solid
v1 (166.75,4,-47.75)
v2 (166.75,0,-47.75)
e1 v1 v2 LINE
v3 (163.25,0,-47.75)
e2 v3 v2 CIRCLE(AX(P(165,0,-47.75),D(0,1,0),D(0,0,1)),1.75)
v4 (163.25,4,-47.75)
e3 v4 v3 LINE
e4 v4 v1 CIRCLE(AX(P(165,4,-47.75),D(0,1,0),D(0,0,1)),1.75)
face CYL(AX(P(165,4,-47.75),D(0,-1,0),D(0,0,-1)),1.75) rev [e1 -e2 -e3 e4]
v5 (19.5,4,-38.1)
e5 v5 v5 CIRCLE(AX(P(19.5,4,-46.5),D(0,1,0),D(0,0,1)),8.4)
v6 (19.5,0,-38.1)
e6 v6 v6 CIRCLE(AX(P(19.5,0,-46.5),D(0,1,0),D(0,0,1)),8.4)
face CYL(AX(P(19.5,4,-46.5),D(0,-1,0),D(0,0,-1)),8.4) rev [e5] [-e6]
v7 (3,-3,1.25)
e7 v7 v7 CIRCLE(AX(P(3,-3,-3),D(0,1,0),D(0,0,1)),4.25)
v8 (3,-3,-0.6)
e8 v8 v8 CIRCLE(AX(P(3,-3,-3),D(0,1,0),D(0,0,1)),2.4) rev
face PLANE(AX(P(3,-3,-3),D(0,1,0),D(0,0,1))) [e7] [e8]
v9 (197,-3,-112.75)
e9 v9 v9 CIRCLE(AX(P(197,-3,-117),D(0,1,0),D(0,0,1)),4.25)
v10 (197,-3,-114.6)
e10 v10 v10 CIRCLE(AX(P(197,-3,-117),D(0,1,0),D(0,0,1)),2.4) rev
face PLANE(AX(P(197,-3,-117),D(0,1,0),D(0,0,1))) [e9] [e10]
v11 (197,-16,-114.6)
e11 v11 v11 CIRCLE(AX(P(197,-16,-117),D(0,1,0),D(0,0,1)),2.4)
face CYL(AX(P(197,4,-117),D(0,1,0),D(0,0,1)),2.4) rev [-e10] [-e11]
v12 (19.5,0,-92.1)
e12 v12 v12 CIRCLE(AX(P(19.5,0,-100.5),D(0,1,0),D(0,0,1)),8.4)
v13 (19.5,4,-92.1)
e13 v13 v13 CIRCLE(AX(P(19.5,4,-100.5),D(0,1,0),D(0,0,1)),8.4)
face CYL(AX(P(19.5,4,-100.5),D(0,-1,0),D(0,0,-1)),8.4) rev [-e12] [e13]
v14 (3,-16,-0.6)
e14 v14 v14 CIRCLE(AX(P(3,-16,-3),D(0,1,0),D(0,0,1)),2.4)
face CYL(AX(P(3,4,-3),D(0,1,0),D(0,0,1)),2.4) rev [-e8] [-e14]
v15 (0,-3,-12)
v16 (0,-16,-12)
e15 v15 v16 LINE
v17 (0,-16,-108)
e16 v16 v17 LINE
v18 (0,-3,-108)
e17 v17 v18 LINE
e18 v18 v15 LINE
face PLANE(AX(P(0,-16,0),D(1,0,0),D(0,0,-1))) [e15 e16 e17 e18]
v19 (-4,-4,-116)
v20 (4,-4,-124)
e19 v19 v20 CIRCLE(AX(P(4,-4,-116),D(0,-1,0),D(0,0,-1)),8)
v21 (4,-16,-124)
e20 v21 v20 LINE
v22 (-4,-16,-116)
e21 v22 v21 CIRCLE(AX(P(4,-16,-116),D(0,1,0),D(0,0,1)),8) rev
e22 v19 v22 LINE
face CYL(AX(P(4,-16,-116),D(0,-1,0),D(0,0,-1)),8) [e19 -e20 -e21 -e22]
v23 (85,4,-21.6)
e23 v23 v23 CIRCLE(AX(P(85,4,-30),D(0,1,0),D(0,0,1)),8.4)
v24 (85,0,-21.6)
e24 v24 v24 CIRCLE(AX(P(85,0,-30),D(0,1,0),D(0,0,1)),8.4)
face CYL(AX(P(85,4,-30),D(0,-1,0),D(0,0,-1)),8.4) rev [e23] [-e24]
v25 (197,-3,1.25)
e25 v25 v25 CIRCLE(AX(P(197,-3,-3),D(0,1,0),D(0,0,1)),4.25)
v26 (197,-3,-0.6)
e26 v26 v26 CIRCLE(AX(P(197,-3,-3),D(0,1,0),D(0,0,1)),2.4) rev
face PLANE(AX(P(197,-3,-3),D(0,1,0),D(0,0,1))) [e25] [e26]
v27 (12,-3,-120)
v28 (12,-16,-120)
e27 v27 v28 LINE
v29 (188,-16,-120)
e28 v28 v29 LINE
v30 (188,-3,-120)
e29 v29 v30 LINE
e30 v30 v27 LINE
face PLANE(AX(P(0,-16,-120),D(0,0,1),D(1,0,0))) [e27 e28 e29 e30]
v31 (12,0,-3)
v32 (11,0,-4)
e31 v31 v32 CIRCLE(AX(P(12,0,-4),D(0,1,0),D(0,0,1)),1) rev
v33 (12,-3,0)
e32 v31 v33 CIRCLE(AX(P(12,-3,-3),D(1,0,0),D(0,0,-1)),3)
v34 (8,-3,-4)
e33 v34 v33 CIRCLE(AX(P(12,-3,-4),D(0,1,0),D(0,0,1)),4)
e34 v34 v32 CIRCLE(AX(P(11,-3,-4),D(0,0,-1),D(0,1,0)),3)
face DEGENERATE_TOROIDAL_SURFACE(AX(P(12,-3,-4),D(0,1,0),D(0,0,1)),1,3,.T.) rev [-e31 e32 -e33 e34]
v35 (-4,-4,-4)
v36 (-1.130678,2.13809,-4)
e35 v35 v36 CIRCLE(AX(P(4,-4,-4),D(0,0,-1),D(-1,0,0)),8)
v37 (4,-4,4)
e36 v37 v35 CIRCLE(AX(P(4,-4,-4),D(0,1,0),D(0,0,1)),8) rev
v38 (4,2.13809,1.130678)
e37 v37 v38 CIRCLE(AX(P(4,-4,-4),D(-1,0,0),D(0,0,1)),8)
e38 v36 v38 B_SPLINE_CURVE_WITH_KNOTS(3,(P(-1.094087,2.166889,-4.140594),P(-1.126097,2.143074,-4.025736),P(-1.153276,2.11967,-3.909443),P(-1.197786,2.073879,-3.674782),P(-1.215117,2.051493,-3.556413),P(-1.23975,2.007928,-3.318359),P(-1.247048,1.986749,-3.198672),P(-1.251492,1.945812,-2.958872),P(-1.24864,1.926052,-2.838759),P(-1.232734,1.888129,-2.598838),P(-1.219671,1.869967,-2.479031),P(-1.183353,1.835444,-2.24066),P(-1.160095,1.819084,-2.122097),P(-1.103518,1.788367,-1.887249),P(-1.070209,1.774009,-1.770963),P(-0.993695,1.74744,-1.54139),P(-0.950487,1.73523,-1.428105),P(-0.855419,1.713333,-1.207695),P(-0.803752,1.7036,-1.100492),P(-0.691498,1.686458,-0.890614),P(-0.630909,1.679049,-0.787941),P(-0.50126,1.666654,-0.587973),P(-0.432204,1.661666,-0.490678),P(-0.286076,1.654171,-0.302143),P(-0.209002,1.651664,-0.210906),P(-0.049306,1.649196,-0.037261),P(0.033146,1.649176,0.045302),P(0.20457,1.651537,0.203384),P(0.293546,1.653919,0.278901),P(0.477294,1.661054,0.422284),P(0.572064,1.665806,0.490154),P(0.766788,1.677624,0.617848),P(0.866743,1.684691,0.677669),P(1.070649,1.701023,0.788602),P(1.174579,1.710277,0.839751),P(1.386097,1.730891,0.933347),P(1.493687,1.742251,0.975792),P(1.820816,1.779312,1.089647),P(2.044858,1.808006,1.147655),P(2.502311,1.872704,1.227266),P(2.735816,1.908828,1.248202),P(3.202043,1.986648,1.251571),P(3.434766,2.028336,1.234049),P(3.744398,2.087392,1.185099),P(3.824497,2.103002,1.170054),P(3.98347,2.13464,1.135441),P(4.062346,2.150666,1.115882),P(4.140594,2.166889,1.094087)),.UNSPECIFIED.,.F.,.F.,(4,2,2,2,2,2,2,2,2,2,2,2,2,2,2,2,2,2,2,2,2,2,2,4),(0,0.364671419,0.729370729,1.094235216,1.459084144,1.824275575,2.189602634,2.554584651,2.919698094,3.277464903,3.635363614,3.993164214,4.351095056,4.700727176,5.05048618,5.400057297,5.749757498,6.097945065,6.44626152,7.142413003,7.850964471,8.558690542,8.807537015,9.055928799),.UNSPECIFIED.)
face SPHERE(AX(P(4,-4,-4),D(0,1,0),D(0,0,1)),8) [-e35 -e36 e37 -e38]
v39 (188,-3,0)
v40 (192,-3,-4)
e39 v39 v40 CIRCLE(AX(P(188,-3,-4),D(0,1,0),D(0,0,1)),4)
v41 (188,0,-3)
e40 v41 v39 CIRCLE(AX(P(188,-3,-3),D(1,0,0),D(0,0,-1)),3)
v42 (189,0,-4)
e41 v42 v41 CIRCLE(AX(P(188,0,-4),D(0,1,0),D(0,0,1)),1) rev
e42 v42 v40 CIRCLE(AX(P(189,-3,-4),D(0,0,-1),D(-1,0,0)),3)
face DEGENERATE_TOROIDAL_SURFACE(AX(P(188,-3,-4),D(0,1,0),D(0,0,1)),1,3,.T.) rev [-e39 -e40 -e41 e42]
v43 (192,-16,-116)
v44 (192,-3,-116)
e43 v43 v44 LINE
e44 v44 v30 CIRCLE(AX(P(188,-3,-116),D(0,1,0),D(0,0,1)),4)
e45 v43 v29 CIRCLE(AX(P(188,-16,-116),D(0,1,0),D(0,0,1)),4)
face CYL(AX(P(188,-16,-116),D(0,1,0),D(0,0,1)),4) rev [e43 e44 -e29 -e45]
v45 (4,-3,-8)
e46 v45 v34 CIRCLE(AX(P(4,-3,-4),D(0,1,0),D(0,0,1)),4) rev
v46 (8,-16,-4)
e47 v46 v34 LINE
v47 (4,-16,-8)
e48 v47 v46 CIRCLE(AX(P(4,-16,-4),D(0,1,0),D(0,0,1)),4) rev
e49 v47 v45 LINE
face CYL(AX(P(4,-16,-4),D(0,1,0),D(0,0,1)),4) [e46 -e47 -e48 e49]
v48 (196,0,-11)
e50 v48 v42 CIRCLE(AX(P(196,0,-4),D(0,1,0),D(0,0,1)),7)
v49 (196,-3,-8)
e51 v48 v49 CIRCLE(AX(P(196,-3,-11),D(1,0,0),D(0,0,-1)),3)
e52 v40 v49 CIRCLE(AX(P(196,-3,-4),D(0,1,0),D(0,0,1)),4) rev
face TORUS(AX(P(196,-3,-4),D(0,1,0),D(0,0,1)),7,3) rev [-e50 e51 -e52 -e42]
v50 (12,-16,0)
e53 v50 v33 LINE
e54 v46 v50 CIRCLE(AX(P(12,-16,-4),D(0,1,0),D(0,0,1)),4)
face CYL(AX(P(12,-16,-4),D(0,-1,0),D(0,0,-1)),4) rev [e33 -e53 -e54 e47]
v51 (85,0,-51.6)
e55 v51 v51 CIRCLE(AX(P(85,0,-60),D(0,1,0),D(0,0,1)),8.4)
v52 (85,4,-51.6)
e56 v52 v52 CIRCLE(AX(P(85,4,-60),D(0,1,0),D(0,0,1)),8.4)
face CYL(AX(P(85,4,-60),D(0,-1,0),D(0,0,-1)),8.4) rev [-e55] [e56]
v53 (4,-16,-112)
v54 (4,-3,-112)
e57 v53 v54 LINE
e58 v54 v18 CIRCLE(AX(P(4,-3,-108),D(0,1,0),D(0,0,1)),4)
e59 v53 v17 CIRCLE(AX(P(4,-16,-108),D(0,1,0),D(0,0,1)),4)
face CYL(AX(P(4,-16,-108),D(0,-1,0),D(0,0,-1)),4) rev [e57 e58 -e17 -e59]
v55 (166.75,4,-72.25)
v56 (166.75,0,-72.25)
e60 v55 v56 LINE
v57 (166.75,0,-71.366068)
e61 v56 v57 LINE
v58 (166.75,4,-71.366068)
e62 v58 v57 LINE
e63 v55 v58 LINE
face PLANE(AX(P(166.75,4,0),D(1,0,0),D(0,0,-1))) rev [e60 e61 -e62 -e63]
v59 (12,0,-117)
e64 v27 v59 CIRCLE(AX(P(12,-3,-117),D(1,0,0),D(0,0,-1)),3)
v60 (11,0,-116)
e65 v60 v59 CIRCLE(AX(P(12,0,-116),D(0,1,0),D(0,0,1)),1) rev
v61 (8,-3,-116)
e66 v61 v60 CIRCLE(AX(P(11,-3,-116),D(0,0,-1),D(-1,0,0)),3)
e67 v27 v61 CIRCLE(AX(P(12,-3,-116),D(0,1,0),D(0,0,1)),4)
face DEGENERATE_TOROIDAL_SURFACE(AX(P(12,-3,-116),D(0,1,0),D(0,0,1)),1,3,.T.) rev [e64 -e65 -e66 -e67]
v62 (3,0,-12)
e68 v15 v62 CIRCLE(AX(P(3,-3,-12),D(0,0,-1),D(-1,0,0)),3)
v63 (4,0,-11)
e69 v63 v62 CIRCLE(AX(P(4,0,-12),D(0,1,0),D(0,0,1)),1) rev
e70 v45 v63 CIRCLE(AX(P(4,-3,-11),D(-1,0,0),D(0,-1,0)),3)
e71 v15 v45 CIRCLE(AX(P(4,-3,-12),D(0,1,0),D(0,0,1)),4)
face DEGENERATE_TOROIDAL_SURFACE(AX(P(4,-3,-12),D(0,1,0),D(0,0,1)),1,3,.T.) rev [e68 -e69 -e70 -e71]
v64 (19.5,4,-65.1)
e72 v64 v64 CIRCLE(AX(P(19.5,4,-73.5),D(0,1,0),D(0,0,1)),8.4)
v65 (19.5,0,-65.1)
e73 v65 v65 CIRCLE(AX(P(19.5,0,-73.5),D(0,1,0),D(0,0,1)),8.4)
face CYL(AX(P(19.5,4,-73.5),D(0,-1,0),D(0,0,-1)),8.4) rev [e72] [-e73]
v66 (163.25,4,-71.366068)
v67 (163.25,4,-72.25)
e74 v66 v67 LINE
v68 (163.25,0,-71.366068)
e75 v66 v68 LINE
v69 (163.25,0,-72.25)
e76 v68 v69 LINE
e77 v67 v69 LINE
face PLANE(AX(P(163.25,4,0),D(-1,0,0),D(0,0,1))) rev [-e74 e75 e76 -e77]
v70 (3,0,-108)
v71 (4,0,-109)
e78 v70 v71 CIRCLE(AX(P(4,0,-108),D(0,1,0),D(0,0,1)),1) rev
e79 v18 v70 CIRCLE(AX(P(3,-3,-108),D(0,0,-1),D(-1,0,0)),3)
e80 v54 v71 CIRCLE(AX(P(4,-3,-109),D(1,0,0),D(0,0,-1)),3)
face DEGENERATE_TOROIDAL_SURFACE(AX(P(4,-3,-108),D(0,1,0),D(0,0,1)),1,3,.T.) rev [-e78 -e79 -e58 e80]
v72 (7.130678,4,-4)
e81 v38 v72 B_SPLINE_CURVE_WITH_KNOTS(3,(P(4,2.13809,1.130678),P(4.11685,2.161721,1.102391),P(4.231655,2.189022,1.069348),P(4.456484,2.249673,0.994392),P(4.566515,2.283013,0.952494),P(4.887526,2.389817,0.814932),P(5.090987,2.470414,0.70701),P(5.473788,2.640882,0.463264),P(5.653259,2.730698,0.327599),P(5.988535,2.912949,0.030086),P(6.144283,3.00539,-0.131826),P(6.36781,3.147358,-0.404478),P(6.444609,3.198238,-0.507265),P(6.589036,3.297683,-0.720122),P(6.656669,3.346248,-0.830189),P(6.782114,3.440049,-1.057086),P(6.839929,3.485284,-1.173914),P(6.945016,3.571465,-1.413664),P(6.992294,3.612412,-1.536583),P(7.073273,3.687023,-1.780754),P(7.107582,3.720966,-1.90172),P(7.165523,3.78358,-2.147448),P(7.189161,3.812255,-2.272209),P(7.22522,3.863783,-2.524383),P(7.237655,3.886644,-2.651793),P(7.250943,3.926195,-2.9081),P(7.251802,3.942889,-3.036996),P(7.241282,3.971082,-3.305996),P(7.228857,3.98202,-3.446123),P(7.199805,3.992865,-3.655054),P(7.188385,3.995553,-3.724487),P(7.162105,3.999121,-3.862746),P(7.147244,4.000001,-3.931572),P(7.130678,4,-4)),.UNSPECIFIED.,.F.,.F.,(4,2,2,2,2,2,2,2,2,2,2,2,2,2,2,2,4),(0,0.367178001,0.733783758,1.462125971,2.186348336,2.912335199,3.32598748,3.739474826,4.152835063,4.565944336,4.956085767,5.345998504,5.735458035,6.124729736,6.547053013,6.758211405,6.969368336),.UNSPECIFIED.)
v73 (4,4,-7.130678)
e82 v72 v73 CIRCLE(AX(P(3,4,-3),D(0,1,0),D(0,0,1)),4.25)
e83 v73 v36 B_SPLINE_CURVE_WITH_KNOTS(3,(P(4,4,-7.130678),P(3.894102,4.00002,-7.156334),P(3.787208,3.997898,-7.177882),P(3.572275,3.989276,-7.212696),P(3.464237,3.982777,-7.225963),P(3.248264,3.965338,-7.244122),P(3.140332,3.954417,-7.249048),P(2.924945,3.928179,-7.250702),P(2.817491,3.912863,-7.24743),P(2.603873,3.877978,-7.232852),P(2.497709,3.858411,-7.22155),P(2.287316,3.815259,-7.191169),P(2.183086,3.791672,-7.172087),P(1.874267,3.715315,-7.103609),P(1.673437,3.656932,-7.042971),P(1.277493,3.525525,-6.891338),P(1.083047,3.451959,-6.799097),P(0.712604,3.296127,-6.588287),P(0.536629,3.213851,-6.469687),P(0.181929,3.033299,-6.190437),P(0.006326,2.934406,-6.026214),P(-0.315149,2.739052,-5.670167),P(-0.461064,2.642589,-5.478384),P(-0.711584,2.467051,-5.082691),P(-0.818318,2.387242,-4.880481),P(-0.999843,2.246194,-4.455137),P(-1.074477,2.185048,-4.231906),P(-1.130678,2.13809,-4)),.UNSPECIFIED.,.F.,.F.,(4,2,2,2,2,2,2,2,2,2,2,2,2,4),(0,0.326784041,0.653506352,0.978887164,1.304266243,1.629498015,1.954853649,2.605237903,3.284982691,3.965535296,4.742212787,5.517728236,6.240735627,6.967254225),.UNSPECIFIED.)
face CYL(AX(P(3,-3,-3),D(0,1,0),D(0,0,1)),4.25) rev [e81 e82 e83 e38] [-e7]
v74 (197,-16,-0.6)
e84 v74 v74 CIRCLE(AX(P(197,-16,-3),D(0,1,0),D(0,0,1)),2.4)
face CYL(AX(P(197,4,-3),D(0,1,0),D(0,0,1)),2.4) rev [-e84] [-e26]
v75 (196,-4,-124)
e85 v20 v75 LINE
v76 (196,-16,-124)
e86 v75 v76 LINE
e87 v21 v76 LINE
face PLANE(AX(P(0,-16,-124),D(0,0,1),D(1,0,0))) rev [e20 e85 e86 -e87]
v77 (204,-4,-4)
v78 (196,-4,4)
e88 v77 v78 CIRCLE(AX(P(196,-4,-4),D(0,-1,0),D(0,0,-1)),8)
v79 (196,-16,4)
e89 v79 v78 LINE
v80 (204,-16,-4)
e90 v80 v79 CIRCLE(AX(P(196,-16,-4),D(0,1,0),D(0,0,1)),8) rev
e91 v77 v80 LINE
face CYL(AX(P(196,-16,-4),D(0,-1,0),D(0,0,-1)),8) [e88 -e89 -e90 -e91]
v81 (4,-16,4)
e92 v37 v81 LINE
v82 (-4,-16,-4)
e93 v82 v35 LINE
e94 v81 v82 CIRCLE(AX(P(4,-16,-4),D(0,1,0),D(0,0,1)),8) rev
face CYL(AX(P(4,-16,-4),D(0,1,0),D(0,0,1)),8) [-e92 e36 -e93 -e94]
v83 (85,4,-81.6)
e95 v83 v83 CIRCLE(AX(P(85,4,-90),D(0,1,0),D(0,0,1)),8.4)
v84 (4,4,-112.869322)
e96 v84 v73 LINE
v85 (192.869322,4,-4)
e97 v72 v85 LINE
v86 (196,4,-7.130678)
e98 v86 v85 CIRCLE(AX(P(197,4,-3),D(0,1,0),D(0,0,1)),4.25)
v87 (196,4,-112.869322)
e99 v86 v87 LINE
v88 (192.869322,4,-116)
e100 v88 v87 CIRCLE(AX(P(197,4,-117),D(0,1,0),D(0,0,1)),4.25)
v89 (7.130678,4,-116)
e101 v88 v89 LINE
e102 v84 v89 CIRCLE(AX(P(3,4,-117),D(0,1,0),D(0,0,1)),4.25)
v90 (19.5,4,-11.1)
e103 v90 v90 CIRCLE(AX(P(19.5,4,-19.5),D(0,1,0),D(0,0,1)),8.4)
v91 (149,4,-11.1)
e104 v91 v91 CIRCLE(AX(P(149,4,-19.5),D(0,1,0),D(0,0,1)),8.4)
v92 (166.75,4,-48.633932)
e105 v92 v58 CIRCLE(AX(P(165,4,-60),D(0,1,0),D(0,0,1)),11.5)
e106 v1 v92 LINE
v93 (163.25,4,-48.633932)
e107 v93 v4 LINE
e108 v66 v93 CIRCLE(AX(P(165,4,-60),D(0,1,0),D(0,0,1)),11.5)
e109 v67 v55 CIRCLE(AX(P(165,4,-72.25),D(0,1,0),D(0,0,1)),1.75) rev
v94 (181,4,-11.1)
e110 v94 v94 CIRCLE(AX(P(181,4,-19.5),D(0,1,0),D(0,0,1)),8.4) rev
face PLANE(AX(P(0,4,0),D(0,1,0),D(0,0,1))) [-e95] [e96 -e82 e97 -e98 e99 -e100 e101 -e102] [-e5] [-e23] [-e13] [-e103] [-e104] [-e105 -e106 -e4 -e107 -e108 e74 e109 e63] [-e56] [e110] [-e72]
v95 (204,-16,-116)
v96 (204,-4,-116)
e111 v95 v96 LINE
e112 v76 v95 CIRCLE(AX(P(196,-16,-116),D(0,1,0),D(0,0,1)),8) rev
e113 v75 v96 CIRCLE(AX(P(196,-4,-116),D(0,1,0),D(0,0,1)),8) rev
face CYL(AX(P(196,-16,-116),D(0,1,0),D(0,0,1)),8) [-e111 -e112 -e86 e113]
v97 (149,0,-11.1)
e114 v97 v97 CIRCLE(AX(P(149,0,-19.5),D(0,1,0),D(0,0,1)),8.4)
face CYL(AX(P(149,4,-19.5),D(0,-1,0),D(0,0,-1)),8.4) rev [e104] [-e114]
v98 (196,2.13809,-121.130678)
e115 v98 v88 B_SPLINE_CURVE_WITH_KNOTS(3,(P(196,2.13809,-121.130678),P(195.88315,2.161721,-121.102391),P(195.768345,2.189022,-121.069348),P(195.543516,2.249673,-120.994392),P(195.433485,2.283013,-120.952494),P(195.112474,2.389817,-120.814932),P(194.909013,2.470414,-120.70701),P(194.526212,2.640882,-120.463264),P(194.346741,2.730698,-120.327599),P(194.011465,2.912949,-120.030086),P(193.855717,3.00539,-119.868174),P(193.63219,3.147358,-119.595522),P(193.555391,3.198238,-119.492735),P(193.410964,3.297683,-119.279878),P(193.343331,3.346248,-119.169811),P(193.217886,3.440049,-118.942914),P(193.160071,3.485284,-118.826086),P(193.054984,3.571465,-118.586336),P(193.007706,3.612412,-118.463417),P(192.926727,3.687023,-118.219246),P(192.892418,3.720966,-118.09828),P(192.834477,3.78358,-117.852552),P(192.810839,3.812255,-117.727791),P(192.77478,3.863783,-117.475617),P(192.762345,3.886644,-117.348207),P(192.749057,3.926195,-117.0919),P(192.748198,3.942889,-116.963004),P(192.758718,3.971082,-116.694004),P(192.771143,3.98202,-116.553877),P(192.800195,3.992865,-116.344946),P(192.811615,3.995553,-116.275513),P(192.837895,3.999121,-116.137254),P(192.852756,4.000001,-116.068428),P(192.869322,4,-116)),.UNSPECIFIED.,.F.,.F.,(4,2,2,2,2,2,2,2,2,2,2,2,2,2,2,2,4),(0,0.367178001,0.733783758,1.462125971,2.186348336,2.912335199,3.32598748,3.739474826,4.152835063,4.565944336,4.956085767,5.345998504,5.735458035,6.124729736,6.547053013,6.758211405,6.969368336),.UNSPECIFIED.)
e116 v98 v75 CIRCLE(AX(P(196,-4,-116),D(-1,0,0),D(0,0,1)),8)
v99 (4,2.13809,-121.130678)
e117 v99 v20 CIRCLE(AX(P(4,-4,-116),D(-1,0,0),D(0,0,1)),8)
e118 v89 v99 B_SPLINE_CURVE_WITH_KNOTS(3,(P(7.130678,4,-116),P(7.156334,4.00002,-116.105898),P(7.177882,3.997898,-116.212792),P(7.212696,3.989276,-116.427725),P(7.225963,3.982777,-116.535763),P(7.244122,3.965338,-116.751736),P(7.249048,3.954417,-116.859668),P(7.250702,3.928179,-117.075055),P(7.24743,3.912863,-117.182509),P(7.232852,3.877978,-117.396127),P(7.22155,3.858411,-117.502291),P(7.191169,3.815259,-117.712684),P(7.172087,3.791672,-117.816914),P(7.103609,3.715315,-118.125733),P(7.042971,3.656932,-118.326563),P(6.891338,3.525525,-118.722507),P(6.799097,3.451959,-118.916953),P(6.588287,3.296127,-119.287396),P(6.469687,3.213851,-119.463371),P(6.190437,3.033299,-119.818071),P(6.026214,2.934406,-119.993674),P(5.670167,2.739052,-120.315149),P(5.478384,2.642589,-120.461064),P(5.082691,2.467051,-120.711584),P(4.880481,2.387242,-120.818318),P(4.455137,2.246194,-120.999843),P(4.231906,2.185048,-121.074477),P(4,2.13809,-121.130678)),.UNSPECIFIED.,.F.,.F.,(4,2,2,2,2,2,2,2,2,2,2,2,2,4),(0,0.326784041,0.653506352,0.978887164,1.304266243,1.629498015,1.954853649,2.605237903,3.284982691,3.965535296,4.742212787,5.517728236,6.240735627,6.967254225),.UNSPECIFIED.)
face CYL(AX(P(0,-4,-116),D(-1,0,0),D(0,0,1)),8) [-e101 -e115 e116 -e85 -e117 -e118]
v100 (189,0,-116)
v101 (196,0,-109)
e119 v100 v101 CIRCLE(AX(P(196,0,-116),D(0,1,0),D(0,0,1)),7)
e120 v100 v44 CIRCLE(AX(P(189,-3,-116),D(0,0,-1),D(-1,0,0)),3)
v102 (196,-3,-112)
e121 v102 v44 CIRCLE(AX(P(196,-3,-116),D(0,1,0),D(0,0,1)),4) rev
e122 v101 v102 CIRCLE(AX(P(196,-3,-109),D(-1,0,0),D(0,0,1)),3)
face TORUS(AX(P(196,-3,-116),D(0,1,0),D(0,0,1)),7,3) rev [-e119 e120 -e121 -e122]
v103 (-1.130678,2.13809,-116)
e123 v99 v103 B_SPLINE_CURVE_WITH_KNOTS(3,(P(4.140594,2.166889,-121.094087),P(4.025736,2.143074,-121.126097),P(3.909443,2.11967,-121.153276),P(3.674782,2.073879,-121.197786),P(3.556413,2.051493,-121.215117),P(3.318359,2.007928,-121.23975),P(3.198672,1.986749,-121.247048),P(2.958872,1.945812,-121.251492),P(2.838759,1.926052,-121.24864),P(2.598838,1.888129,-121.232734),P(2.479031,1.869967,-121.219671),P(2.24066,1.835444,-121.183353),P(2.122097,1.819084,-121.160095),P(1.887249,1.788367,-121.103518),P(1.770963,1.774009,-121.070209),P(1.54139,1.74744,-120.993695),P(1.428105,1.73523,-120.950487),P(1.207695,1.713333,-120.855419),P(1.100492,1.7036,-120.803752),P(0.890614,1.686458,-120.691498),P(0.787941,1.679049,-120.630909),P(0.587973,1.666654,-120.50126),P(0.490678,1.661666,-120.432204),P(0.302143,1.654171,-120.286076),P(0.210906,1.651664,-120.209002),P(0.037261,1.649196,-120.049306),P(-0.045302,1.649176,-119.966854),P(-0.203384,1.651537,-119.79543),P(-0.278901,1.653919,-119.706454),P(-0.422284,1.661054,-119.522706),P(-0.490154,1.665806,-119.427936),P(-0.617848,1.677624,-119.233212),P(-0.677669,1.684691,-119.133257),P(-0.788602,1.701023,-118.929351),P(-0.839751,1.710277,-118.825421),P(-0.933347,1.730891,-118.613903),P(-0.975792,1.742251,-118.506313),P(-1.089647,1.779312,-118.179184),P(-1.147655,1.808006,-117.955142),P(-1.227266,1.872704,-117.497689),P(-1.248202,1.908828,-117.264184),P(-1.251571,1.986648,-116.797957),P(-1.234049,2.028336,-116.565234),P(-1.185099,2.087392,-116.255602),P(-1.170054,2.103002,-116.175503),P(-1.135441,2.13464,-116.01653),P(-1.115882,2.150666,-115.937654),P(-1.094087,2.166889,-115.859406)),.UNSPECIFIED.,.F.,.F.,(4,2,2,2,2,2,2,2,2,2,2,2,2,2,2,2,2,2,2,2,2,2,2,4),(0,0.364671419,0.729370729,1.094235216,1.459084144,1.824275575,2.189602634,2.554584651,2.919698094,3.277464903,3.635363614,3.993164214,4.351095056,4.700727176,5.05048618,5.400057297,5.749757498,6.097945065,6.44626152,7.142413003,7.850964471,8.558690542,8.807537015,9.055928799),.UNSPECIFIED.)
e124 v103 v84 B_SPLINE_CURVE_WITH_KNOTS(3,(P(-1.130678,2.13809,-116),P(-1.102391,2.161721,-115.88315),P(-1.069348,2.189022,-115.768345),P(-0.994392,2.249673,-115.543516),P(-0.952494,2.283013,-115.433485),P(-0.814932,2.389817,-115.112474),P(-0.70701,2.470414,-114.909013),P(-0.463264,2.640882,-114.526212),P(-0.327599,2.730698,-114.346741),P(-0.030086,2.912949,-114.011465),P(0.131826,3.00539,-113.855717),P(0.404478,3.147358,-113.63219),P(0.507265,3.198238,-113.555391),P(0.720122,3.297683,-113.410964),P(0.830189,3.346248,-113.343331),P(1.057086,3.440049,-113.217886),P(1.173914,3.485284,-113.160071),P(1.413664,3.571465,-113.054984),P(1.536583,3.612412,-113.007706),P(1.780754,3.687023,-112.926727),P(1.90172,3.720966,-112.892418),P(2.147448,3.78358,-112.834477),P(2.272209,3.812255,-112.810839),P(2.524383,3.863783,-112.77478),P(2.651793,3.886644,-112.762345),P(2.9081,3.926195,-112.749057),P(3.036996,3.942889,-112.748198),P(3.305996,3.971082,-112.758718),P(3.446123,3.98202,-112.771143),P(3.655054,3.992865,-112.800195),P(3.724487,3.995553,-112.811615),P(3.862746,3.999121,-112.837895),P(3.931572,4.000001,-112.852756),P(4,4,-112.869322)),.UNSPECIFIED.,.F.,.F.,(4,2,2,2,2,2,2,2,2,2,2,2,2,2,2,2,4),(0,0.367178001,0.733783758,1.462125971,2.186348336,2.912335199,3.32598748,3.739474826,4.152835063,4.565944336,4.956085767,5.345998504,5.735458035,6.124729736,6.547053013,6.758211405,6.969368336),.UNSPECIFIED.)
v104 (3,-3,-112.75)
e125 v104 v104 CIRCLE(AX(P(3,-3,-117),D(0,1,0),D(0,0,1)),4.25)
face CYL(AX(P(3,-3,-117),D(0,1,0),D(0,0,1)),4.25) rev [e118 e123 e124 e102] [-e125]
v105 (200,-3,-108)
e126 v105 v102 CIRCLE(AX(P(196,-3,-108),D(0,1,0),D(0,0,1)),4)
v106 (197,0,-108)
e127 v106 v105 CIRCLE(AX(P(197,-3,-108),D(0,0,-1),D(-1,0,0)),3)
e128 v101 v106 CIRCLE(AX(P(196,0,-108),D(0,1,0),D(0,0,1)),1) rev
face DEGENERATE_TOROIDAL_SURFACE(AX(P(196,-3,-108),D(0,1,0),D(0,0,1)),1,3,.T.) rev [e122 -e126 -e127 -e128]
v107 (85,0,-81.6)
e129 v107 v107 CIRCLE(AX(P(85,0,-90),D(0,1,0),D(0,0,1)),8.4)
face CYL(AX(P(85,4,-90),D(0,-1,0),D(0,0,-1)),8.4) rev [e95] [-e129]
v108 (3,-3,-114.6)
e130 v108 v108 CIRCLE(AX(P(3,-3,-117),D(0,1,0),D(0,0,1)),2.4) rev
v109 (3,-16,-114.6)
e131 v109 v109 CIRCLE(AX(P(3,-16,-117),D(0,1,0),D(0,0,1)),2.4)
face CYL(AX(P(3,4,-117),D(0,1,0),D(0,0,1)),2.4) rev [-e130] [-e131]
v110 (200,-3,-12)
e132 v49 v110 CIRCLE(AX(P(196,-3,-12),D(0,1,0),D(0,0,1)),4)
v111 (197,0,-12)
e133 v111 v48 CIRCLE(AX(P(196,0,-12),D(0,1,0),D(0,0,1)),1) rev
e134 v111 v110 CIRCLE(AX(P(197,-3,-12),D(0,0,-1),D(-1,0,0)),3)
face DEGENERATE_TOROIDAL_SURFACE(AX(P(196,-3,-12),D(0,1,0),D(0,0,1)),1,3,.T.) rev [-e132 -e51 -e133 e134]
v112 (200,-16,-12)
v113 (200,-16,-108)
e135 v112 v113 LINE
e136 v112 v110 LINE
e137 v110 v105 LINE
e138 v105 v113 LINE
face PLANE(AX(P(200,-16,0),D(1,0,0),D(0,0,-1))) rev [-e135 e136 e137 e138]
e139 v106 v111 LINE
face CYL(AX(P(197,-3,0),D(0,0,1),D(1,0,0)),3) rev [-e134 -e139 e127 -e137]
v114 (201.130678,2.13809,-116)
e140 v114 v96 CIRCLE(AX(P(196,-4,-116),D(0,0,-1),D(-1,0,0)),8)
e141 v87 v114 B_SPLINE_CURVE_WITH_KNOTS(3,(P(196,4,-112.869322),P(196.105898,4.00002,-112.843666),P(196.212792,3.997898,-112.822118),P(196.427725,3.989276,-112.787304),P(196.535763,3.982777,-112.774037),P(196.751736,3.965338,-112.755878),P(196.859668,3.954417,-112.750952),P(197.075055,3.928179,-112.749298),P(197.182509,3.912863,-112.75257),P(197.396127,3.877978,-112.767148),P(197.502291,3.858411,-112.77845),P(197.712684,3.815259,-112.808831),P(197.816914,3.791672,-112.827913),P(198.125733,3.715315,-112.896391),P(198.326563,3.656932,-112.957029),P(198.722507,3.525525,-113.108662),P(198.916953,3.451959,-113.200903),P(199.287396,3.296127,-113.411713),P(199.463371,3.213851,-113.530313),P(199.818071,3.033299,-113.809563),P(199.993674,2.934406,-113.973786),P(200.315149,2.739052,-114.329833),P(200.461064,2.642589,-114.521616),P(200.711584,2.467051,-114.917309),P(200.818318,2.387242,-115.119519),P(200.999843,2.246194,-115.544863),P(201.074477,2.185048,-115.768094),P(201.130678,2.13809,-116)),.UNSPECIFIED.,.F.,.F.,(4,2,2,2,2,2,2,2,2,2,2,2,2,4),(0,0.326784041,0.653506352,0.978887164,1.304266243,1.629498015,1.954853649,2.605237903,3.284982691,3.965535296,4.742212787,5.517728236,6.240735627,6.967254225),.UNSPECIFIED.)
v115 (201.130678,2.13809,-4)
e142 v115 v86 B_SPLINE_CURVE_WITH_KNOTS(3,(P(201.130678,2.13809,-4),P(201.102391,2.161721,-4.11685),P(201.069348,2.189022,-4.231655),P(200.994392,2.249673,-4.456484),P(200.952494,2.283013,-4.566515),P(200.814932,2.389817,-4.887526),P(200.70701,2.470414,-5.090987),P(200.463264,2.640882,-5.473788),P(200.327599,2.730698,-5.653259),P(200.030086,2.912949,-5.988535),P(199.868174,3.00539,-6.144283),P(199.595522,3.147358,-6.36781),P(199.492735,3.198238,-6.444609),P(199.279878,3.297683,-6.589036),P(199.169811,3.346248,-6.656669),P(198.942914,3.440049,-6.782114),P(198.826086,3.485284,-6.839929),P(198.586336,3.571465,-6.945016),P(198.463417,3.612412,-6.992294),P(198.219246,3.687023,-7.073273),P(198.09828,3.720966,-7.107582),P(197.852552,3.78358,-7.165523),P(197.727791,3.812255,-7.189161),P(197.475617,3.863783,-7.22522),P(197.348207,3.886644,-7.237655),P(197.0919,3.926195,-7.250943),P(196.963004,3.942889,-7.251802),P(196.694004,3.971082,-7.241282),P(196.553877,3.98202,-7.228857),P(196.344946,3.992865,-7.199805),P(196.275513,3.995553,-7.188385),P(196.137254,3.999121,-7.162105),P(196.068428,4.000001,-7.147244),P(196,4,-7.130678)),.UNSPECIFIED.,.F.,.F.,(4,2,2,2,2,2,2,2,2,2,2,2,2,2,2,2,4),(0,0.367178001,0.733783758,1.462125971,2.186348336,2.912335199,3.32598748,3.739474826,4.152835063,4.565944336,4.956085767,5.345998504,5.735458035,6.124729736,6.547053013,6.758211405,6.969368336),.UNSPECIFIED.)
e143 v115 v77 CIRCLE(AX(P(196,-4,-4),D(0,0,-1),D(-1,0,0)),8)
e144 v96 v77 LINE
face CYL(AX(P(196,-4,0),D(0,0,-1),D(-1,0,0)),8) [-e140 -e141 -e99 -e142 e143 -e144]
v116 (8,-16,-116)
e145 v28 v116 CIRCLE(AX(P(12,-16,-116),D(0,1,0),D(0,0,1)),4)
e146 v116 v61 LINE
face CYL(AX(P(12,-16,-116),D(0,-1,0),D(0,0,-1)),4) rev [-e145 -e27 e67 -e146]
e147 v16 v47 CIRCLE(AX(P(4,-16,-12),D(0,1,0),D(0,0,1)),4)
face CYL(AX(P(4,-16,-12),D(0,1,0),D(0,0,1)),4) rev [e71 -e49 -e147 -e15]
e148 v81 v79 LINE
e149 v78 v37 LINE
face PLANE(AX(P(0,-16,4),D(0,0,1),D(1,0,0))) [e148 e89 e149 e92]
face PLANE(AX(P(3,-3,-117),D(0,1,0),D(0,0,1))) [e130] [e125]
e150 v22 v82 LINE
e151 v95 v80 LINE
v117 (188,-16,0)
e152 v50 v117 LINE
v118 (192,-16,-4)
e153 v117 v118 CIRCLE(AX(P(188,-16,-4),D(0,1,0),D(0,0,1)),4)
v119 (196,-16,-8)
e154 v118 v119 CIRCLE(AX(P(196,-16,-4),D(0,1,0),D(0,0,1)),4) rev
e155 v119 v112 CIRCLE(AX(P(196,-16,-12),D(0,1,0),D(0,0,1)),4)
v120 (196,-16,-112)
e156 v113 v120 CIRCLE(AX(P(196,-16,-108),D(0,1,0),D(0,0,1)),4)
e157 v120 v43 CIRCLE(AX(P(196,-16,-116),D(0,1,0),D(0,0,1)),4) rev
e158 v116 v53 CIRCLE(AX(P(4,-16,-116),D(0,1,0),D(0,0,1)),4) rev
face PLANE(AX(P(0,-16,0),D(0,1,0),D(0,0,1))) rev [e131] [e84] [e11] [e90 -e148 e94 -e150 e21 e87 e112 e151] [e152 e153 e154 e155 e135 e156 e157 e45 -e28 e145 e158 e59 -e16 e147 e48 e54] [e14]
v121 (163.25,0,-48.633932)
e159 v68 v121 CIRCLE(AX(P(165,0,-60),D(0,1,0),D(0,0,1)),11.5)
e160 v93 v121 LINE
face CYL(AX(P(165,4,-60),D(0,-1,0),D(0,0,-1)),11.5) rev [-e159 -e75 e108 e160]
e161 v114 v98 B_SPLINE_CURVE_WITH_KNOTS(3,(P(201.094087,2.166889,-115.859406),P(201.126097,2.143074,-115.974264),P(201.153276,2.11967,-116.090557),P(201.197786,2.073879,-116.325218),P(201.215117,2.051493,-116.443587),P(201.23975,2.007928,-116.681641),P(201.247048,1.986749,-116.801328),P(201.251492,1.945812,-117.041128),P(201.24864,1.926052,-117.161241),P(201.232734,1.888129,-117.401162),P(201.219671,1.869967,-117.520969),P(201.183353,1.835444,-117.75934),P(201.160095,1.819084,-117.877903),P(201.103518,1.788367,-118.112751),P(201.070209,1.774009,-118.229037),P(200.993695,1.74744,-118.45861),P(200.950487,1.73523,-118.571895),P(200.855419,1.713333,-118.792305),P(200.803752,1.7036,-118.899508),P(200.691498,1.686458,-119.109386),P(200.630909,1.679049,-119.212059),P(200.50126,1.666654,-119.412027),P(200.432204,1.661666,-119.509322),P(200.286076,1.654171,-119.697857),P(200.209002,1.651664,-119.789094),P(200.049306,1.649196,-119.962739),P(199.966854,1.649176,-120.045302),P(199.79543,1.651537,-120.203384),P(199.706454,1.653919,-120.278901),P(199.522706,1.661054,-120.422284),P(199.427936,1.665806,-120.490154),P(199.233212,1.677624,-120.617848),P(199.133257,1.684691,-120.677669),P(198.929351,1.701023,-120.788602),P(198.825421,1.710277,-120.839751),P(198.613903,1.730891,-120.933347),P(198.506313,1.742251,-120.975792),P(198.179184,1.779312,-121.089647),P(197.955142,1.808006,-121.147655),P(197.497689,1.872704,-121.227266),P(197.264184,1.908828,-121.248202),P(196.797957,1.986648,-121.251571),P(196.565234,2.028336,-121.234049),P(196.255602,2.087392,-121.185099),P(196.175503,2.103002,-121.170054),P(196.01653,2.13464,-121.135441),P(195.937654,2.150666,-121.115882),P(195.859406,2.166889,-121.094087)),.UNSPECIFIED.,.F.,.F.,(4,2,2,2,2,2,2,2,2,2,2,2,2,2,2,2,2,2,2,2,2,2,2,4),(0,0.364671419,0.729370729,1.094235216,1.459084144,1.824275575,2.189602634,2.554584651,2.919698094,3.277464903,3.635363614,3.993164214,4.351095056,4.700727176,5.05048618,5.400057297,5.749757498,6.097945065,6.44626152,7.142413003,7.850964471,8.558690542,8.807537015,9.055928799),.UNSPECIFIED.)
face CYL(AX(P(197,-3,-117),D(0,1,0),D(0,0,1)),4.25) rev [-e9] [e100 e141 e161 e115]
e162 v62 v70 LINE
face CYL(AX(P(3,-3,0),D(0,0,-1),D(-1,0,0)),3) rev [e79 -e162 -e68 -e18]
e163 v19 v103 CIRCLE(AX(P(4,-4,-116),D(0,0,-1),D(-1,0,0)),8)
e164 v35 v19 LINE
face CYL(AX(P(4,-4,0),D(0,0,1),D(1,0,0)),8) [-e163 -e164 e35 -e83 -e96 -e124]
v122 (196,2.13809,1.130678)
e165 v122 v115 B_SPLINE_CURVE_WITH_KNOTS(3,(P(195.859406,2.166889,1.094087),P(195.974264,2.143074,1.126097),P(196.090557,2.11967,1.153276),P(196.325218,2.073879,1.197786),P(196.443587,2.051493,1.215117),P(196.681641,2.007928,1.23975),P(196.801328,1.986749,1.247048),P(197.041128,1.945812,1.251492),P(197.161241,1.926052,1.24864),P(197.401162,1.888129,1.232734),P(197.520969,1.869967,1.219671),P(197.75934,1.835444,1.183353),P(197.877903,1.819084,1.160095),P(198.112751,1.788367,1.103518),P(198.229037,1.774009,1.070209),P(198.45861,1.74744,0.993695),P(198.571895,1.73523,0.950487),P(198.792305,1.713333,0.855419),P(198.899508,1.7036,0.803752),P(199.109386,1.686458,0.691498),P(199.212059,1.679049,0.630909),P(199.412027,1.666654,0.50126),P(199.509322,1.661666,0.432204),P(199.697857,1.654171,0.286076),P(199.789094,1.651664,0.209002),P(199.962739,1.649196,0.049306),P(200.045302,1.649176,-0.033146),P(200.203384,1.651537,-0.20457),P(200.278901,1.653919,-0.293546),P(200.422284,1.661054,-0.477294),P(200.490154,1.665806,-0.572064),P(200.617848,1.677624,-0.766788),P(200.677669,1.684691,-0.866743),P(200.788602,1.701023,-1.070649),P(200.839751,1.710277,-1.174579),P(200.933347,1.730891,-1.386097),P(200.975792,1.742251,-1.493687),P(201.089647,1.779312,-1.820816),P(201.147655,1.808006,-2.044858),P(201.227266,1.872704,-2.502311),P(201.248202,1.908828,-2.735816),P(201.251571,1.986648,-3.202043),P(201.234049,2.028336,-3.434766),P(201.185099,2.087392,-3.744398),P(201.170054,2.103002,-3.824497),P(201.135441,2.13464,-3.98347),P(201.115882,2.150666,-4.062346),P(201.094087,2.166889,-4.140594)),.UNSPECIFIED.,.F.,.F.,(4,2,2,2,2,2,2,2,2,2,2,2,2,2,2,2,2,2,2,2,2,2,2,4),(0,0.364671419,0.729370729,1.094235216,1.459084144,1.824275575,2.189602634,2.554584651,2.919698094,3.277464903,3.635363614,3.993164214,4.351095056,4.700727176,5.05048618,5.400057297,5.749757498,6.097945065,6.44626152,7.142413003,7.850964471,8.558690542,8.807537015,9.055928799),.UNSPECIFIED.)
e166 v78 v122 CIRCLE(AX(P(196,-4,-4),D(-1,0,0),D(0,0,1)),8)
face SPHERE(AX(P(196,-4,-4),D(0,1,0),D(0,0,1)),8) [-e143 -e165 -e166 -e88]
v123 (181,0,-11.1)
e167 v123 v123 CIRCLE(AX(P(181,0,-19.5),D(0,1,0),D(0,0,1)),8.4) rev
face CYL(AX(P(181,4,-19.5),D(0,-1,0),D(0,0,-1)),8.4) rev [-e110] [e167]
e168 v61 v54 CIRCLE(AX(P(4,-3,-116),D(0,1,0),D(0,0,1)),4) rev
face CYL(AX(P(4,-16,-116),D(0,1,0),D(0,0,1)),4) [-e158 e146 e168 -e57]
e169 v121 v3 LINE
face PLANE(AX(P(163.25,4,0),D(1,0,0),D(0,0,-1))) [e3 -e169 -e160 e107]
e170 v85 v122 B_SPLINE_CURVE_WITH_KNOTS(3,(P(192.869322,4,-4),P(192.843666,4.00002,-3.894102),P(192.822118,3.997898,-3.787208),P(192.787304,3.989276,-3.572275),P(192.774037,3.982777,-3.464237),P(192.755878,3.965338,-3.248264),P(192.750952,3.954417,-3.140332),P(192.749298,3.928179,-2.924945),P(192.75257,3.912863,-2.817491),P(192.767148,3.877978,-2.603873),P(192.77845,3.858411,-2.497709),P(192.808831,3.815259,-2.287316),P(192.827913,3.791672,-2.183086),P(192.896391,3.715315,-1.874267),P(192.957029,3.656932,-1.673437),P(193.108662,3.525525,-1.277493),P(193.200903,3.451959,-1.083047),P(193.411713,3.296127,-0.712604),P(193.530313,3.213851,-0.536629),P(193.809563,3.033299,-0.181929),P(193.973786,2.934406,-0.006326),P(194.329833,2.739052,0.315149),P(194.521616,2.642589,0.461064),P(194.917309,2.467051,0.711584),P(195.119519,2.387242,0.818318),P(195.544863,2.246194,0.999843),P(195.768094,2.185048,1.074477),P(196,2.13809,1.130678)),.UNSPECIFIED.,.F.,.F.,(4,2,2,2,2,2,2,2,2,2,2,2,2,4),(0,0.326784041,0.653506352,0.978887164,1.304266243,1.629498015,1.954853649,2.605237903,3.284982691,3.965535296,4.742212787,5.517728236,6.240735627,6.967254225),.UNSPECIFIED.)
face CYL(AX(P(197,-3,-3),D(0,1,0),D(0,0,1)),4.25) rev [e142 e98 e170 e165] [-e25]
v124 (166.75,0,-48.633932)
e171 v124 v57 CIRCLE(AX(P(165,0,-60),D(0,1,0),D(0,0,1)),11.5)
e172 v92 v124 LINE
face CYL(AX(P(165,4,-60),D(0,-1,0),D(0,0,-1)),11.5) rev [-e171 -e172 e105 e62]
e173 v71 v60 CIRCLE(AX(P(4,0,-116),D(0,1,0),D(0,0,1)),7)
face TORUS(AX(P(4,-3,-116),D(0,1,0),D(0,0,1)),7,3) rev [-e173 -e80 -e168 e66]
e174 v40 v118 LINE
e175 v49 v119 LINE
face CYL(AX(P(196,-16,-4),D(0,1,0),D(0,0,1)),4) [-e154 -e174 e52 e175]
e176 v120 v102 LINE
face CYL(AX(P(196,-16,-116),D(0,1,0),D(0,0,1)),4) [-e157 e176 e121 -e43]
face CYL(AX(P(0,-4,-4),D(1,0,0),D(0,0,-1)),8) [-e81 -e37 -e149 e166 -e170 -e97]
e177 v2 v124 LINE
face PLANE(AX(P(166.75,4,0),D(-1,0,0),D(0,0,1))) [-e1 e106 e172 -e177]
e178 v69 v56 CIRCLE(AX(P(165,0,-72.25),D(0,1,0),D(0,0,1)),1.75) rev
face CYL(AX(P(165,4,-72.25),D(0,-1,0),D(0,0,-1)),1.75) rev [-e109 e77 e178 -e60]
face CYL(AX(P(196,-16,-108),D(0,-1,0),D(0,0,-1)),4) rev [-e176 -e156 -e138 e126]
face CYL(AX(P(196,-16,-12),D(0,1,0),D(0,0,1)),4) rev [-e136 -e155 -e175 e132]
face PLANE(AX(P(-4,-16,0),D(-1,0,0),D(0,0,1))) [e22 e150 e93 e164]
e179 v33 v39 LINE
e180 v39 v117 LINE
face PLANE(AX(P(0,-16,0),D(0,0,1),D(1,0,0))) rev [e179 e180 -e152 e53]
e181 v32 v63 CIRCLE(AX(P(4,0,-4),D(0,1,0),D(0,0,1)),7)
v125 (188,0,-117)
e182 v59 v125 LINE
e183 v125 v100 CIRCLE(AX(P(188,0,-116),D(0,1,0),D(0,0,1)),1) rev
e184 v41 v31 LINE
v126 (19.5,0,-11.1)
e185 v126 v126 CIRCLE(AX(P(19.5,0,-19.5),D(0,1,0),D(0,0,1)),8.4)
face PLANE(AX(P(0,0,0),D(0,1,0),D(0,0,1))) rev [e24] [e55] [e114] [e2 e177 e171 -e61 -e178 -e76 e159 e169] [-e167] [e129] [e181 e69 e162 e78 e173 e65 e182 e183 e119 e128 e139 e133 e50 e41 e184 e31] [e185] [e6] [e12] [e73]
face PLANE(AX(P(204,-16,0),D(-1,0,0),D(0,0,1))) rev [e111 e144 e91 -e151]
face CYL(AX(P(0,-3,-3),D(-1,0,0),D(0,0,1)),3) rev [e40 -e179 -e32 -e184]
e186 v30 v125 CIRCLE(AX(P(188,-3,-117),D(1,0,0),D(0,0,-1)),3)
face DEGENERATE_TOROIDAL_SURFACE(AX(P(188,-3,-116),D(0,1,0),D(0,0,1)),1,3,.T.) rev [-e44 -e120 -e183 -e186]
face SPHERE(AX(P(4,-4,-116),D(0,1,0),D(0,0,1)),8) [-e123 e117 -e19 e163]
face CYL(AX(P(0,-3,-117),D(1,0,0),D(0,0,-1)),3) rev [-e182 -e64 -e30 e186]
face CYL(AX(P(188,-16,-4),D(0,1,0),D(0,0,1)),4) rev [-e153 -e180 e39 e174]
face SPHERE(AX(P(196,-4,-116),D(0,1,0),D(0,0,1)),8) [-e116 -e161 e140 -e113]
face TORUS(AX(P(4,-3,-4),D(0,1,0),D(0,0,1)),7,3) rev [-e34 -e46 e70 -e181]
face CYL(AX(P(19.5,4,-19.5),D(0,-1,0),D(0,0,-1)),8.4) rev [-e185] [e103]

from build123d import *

# Parameters (mm, degrees)
SKETCH1_W            = 208
SKETCH1_H            = 128
SKETCH1_W_2          = 200
SKETCH1_H_2          = 120
SKETCH1_W_3          = 8
SKETCH1_H_3          = 8
BOSS_EXTRUDE1_DEPTH  = 16
SKETCH1_3_W          = 208
SKETCH1_3_H          = 128
SKETCH1_3_R          = 8.4
BOSS_EXTRUDE2_DEPTH  = 4
M4_CLEARANCE_HOLE1_D = 4.8
FILLET2_R            = 8
FILLET1_R            = 4
FILLET3_R            = 8
FILLET4_R            = 3
SKETCH8_R            = 4.25
CUT_EXTRUDE1_DEPTH   = 7


# Some blends are built 0.0001 mm under size
with BuildPart() as part:
    # Sketch1 → Boss-Extrude1 (new body)
    # profile 1 of 5: a face of its own
    with BuildSketch(Plane(origin=(0, 0, 0), x_dir=(1, 0, 0), z_dir=(0, 1, 0))):
        with Locations((100, 60)):
            Rectangle(SKETCH1_W, SKETCH1_H)
        with Locations((100, 60)):
            Rectangle(SKETCH1_W_2, SKETCH1_H_2, mode=Mode.SUBTRACT)
    # profile 2 of 5: a face of its own
    with BuildSketch(Plane(origin=(0, 0, 0), x_dir=(1, 0, 0), z_dir=(0, 1, 0))):
        with Locations((4, 4)):
            Rectangle(SKETCH1_W_3, SKETCH1_H_3)
    # profile 3 of 5: a face of its own
    with BuildSketch(Plane(origin=(0, 0, 0), x_dir=(1, 0, 0), z_dir=(0, 1, 0))):
        with Locations((196, 4)):
            Rectangle(SKETCH1_W_3, SKETCH1_H_3)
    # profile 4 of 5: a face of its own
    with BuildSketch(Plane(origin=(0, 0, 0), x_dir=(1, 0, 0), z_dir=(0, 1, 0))):
        with Locations((196, 116)):
            Rectangle(SKETCH1_W_3, SKETCH1_H_3)
    # profile 5 of 5: a face of its own
    with BuildSketch(Plane(origin=(0, 0, 0), x_dir=(1, 0, 0), z_dir=(0, 1, 0))):
        with Locations((4, 116)):
            Rectangle(SKETCH1_W_3, SKETCH1_H_3)
    extrude(amount=-BOSS_EXTRUDE1_DEPTH)

    # Sketch1<3> → Boss-Extrude2 (add)
    with BuildSketch(Plane(origin=(0, 0, 0), x_dir=(1, 0, 0), z_dir=(0, 1, 0))):
        with Locations((100, 60)):
            Rectangle(SKETCH1_3_W, SKETCH1_3_H)
        with Locations(Location((85, 90, 0), (0, 0, 270))):
            Circle(SKETCH1_3_R, mode=Mode.SUBTRACT)
        with Locations(Location((19.5, 100.5, 0), (0, 0, 270))):
            Circle(SKETCH1_3_R, mode=Mode.SUBTRACT)
        with Locations(Location((19.5, 19.5, 0), (0, 0, 270))):
            Circle(SKETCH1_3_R, mode=Mode.SUBTRACT)
        with Locations(Location((19.5, 46.5, 0), (0, 0, 270))):
            Circle(SKETCH1_3_R, mode=Mode.SUBTRACT)
        with Locations(Location((85, 30, 0), (0, 0, 270))):
            Circle(SKETCH1_3_R, mode=Mode.SUBTRACT)
        with Locations(Location((85, 60, 0), (0, 0, 270))):
            Circle(SKETCH1_3_R, mode=Mode.SUBTRACT)
        with Locations(Location((149, 19.5, 0), (0, 0, 270))):
            Circle(SKETCH1_3_R, mode=Mode.SUBTRACT)
        with Locations(Location((181, 19.5, 0), (0, 0, 270))):
            Circle(SKETCH1_3_R, mode=Mode.SUBTRACT)
        with BuildLine():
            ThreePointArc((163.25, 48.633932078), (153.5, 60), (163.25, 71.366067922))
            Line((163.25, 71.366067922), (163.25, 72.25))
            ThreePointArc((163.25, 72.25), (165, 74), (166.75, 72.25))
            Line((166.75, 72.25), (166.75, 71.366067922))
            ThreePointArc((166.75, 71.366067922), (176.5, 60), (166.75, 48.633932078))
            Line((166.75, 48.633932078), (166.75, 47.75))
            ThreePointArc((166.75, 47.75), (165, 46), (163.25, 47.75))
            Line((163.25, 47.75), (163.25, 48.633932078))
        make_face(mode=Mode.SUBTRACT)
        with Locations(Location((19.5, 73.5, 0), (0, 0, 270))):
            Circle(SKETCH1_3_R, mode=Mode.SUBTRACT)
    extrude(amount=BOSS_EXTRUDE2_DEPTH)

    # M4 Clearance Hole1 (through all)
    with Locations(Plane(origin=(0, 4, 0), x_dir=(1, 0, 0), z_dir=(0, 1, 0))):
        with Locations((3, 117), (197, 3), (3, 3), (197, 117)):
            Hole(M4_CLEARANCE_HOLE1_D / 2)

    # Fillet2
    fillet2_edges = [part.edges().sort_by_distance(p)[0] for p in [
        (204, -6, 4),
        (-4, -6, 4),
        (-4, -6, -124),
        (204, -6, -124),
    ]]
    fillet(fillet2_edges, radius=FILLET2_R)

    # Fillet1
    fillet1_edges = [part.edges().sort_by_distance(p)[0] for p in [
        (192, -8, 0),
        (192, -8, -8),
        (200, -8, -8),
        (8, -8, 0),
        (8, -8, -8),
        (0, -8, -8),
        (0, -8, -112),
        (8, -8, -120),
        (8, -8, -112),
        (192, -8, -120),
        (192, -8, -112),
        (200, -8, -112),
    ]]
    fillet(fillet1_edges, radius=FILLET1_R - 0.0001)  # a hair under: the kernel refuses the full size

    # Fillet3
    # the kernel refuses this fillet: 8 mm, written as the material it takes off along each edge
    with BuildSketch(Plane(origin=(-4, 4, -116), x_dir=(0, -1, 0), z_dir=(0, 0, 1)), Plane(origin=(204, 4, -4), x_dir=(0, -1, 0), z_dir=(0, 0, -1))) as fillet3_piece_1:
        with BuildLine():
            CenterArc((FILLET3_R, FILLET3_R), FILLET3_R, 180, 90)
            Line((0, FILLET3_R), (0, 0))
            Line((0, 0), (FILLET3_R, 0))
        make_face()
    extrude(amount=112, mode=Mode.SUBTRACT)
    with BuildSketch(Plane(origin=(196, 4, -124), x_dir=(0, -1, 0), z_dir=(-1, 0, 0)), Plane(origin=(4, 4, 4), x_dir=(0, -1, 0), z_dir=(1, 0, 0))) as fillet3_piece_2:
        with BuildLine():
            CenterArc((FILLET3_R, FILLET3_R), FILLET3_R, 180, 90)
            Line((0, FILLET3_R), (0, 0))
            Line((0, 0), (FILLET3_R, 0))
        make_face()
    extrude(amount=192, mode=Mode.SUBTRACT)
    with BuildSketch(Plane(origin=(4, 4, -4), x_dir=(0, 0, 1), z_dir=(1, 0, 0))) as fillet3_piece_3:
        with BuildLine():
            CenterArc((8 - FILLET3_R, FILLET3_R), FILLET3_R, 270, 90)
            Line((8 - FILLET3_R, 0), (8, 0))
            Line((8, 0), (8, FILLET3_R))
        make_face()
    revolve(axis=Axis((4, 4, -4), (0, -1, 0)), revolution_arc=90, mode=Mode.SUBTRACT)
    with BuildSketch(Plane(origin=(196, 4, -4), x_dir=(1, 0, 0), z_dir=(0, 0, -1))) as fillet3_piece_4:
        with BuildLine():
            CenterArc((8 - FILLET3_R, FILLET3_R), FILLET3_R, 270, 90)
            Line((8 - FILLET3_R, 0), (8, 0))
            Line((8, 0), (8, FILLET3_R))
        make_face()
    revolve(axis=Axis((196, 4, -4), (0, -1, 0)), revolution_arc=90, mode=Mode.SUBTRACT)
    with BuildSketch(Plane(origin=(196, 4, -116), x_dir=(1, 0, 0), z_dir=(0, 0, 1))) as fillet3_piece_5:
        with BuildLine():
            CenterArc((8 - FILLET3_R, -FILLET3_R), FILLET3_R, 0, 90)
            Line((8 - FILLET3_R, 0), (8, 0))
            Line((8, 0), (8, -FILLET3_R))
        make_face()
    revolve(axis=Axis((196, 4, -116), (0, 1, 0)), revolution_arc=90, mode=Mode.SUBTRACT)
    with BuildSketch(Plane(origin=(4, 4, -116), x_dir=(0, 0, -1), z_dir=(1, 0, 0))) as fillet3_piece_6:
        with BuildLine():
            CenterArc((8 - FILLET3_R, -FILLET3_R), FILLET3_R, 0, 90)
            Line((8 - FILLET3_R, 0), (8, 0))
            Line((8, 0), (8, -FILLET3_R))
        make_face()
    revolve(axis=Axis((4, 4, -116), (0, 1, 0)), revolution_arc=90, mode=Mode.SUBTRACT)

    # Fillet4
    fillet4_edges = [part.edges().sort_by_distance(p)[0] for p in [
        (200, 0, -60),
        (100, 0, 0),
        (0, 0, -60),
        (100, 0, -120),
        (198.828456414, 0, -110.828456414),
        (190.828456414, 0, -118.828456414),
        (9.171543586, 0, -118.828456414),
        (1.171543586, 0, -110.828456414),
        (1.171543586, 0, -9.171543586),
        (9.171543586, 0, -1.171543586),
        (198.828456414, 0, -9.171543586),
        (190.828456414, 0, -1.171543586),
        (193.171543586, 0, -6.828456414),
        (6.828456414, 0, -6.828456414),
        (6.828456414, 0, -113.171543586),
        (193.171543586, 0, -113.171543586),
    ]]
    fillet(fillet4_edges, radius=FILLET4_R)

    # Sketch8 → Cut-Extrude1 (cut)
    with BuildSketch(Plane(origin=(0, 4, 0), x_dir=(1, 0, 0), z_dir=(0, 1, 0))):
        with Locations(Location((3, 117, 0), (0, 0, 270))):
            Circle(SKETCH8_R)
        with Locations(Location((197, 117, 0), (0, 0, 270))):
            Circle(SKETCH8_R)
        with Locations(Location((197, 3, 0), (0, 0, 270))):
            Circle(SKETCH8_R)
        with Locations(Location((3, 3, 0), (0, 0, 270))):
            Circle(SKETCH8_R)
    extrude(amount=-CUT_EXTRUDE1_DEPTH, mode=Mode.SUBTRACT)


solid = part.part
